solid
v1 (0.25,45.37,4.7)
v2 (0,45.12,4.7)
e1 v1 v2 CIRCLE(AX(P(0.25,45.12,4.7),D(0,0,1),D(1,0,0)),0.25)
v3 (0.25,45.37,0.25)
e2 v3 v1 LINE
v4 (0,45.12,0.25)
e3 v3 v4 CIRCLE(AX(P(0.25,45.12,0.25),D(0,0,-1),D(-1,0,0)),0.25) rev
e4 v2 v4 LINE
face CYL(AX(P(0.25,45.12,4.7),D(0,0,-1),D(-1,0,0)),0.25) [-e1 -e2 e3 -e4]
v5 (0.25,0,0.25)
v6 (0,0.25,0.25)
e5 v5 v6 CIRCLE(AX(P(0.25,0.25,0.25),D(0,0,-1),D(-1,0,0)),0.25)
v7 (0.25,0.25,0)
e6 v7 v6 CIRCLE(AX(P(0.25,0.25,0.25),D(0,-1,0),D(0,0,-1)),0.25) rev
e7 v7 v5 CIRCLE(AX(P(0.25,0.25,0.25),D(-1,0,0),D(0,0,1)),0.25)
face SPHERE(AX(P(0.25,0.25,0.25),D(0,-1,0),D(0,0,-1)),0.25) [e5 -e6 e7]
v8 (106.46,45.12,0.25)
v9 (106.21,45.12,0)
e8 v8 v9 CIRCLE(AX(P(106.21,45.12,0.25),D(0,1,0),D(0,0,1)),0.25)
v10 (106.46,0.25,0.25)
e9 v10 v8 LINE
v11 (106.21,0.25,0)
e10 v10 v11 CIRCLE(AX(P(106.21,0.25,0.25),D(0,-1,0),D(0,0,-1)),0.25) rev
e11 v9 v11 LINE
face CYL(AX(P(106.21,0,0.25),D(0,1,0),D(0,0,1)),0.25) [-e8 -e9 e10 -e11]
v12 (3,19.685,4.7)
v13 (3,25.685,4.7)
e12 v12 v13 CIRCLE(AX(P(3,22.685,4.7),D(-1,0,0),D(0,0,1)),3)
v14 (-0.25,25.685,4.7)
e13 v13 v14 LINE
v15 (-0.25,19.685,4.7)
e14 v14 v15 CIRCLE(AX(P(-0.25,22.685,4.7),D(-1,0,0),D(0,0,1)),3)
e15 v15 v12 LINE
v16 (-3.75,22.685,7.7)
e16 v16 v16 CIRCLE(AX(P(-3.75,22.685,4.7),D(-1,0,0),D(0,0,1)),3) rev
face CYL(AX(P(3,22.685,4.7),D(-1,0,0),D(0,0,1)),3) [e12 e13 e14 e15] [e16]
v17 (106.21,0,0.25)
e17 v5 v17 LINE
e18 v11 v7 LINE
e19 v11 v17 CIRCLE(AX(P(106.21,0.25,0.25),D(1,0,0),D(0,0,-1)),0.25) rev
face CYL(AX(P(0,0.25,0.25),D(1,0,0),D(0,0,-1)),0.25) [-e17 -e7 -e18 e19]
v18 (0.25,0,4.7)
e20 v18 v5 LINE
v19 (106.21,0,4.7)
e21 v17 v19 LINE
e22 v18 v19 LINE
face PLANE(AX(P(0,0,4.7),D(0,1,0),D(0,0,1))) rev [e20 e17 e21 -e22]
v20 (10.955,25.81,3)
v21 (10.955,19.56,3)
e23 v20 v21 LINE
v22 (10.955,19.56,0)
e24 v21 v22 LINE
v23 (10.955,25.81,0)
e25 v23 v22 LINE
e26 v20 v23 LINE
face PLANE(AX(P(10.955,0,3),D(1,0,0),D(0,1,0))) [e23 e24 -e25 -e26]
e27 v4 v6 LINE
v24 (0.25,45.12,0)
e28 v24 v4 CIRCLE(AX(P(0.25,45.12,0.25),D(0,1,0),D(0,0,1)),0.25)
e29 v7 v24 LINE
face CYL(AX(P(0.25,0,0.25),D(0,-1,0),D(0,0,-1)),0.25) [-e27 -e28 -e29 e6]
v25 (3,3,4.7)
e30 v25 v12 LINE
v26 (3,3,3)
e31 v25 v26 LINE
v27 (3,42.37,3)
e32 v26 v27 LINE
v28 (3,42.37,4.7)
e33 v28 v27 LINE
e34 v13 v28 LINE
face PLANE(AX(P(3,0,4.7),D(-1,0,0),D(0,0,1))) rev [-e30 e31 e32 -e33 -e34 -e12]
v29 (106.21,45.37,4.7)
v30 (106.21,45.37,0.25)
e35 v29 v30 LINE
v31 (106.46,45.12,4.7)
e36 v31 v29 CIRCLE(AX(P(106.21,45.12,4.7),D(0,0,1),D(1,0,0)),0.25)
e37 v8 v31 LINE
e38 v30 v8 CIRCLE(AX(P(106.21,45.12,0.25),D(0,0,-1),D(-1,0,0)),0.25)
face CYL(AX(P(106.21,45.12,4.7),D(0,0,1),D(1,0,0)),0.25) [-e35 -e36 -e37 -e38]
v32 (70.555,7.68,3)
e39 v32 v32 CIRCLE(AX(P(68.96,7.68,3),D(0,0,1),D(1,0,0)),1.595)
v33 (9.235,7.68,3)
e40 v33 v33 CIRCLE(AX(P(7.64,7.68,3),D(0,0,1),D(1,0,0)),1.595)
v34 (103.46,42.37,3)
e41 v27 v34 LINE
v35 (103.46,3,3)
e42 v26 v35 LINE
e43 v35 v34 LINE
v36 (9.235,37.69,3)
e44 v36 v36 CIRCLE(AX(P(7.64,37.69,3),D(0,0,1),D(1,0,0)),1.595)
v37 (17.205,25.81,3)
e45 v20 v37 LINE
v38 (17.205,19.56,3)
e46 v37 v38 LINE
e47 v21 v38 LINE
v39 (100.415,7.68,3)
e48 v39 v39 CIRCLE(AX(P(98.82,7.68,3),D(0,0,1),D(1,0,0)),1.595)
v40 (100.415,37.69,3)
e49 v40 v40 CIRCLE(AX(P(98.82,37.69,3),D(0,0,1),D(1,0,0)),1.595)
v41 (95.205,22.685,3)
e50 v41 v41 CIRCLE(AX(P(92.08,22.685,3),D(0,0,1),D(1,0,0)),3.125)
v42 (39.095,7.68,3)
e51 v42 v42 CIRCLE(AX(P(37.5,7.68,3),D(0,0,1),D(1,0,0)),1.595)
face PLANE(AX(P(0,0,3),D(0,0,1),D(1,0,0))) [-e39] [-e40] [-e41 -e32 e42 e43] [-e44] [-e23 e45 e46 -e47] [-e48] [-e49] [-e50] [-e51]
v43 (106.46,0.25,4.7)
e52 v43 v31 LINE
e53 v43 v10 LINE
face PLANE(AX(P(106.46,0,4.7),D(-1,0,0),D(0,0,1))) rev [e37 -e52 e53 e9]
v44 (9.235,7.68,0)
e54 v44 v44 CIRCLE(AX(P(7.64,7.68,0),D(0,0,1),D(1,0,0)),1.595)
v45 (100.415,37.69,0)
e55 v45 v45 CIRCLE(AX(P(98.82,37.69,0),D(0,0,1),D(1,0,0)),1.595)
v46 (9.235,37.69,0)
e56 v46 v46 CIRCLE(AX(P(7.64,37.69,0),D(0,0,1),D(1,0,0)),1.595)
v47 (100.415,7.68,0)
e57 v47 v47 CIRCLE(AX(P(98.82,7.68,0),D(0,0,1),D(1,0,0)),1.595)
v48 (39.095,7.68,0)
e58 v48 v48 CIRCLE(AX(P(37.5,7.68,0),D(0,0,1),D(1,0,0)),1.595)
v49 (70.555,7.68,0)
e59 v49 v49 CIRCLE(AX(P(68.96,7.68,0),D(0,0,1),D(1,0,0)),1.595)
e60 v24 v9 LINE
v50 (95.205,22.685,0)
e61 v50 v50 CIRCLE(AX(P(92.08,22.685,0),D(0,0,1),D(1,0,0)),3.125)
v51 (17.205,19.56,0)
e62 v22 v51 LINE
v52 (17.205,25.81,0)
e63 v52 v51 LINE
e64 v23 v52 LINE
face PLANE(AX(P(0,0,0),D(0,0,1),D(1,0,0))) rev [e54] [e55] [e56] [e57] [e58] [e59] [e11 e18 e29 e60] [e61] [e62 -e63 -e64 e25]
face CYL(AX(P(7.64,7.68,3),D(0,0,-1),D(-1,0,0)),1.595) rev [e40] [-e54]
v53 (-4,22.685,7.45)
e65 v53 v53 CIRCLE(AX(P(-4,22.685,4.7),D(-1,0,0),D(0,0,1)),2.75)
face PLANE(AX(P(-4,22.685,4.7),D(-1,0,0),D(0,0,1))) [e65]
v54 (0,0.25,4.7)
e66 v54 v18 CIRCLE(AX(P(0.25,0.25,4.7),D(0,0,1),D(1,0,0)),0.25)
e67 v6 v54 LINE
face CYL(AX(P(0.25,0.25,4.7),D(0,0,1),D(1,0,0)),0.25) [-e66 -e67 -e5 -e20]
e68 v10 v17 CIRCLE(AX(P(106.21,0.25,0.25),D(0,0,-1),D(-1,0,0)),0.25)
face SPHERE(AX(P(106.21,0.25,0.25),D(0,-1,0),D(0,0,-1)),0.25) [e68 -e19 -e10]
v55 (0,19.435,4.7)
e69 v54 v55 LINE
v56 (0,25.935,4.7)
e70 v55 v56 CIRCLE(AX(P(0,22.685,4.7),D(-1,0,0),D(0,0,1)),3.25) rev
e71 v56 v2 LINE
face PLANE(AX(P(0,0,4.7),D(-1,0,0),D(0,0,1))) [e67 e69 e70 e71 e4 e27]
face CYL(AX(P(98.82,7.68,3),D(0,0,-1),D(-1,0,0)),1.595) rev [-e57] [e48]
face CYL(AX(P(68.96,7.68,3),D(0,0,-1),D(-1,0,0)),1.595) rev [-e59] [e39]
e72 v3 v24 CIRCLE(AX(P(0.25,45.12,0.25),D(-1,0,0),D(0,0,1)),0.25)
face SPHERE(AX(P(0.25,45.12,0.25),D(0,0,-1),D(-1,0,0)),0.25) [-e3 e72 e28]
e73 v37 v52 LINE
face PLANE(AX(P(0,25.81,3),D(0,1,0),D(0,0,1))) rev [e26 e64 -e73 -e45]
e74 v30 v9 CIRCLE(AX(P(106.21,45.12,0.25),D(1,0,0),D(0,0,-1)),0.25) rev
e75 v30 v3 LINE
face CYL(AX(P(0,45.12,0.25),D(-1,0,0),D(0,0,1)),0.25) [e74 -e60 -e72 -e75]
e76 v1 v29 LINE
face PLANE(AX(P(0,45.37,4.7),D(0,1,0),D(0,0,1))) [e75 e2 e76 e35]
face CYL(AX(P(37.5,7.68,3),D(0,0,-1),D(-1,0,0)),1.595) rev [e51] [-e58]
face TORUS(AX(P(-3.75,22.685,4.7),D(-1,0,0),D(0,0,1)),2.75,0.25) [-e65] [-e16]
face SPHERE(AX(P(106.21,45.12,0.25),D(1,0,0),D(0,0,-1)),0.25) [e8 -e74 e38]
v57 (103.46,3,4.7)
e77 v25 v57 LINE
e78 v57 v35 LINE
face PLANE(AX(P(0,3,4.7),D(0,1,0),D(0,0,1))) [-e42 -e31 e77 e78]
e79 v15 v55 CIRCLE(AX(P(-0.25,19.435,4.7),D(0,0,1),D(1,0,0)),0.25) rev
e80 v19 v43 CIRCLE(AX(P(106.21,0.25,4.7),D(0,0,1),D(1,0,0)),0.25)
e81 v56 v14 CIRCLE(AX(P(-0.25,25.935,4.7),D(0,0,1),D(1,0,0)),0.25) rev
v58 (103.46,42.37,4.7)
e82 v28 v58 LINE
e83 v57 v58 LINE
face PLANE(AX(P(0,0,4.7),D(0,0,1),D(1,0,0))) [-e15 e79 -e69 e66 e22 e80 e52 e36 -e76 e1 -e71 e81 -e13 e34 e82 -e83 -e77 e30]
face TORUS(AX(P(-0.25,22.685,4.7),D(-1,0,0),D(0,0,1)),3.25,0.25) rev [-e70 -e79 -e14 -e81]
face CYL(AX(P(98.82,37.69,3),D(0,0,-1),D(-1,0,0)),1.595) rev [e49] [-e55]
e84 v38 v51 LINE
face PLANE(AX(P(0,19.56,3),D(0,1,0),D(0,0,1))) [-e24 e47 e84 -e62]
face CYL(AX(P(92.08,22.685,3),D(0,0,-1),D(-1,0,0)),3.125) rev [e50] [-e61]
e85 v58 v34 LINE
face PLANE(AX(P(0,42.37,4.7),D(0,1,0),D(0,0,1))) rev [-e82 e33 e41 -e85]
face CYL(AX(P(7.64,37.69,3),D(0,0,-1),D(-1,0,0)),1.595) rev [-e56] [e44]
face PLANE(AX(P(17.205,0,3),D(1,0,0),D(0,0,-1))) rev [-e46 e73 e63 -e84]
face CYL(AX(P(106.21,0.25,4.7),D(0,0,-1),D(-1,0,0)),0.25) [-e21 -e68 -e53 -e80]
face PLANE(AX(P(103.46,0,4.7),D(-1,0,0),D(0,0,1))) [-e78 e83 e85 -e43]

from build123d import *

# Parameters (mm, degrees)
SKETCH1_W                = 100.46
SKETCH1_H                = 39.37
SKETCH1_R                = 1.595
SKETCH1_R_2              = 3.125
SKETCH1_W_2              = 6.25
SKETCH1_H_2              = 6.25
BOSS_EXTRUDE1_DEPTH      = 3
SKETCH1_5_W              = 106.46
SKETCH1_5_H              = 45.37
SKETCH1_5_W_2            = 100.46
SKETCH1_5_H_2            = 39.37
BOSS_EXTRUDE2_DEPTH      = 4.7
BOSS_EXTRUDE3_DEPTH      = 4
BOSS_EXTRUDE3_DEPTH_BACK = 3
SKETCH2_R                = 3
FILLET1_R                = 0.25


with BuildPart() as part:
    # Sketch1 → Boss-Extrude1 (new body)
    with BuildSketch(Plane.XY):
        with Locations((53.23, 22.685)):
            Rectangle(SKETCH1_W, SKETCH1_H)
        with Locations((7.64, 7.68)):
            Circle(SKETCH1_R, mode=Mode.SUBTRACT)
        with Locations((37.5, 7.68)):
            Circle(SKETCH1_R, mode=Mode.SUBTRACT)
        with Locations((68.96, 7.68)):
            Circle(SKETCH1_R, mode=Mode.SUBTRACT)
        with Locations((98.82, 7.68)):
            Circle(SKETCH1_R, mode=Mode.SUBTRACT)
        with Locations((7.64, 37.69)):
            Circle(SKETCH1_R, mode=Mode.SUBTRACT)
        with Locations((98.82, 37.69)):
            Circle(SKETCH1_R, mode=Mode.SUBTRACT)
        with Locations((92.08, 22.685)):
            Circle(SKETCH1_R_2, mode=Mode.SUBTRACT)
        with Locations((14.08, 22.685)):
            Rectangle(SKETCH1_W_2, SKETCH1_H_2, mode=Mode.SUBTRACT)
    extrude(amount=BOSS_EXTRUDE1_DEPTH)

    # Sketch1<5> → Boss-Extrude2 (add)
    with BuildSketch(Plane.XY):
        with Locations((53.23, 22.685)):
            Rectangle(SKETCH1_5_W, SKETCH1_5_H)
        with Locations((53.23, 22.685)):
            Rectangle(SKETCH1_5_W_2, SKETCH1_5_H_2, mode=Mode.SUBTRACT)
    extrude(amount=BOSS_EXTRUDE2_DEPTH)

    # Sketch2 → Boss-Extrude3 (add, two sides: drawn at the far end of the back side and taken through both)
    with BuildSketch(Plane.ZY.offset(-BOSS_EXTRUDE3_DEPTH_BACK)):
        with Locations((4.7, 22.685)):
            Circle(SKETCH2_R)
    extrude(amount=BOSS_EXTRUDE3_DEPTH + BOSS_EXTRUDE3_DEPTH_BACK)

    # Fillet1
    # the kernel refuses this fillet: 0.25 mm, written as the material it adds along each edge
    with BuildSketch(Plane(origin=(0, 22.685, 4.7), x_dir=(0, 1, 0), z_dir=(0, 0, 1))) as fillet1_piece_1:
        with BuildLine():
            CenterArc((3 + FILLET1_R, FILLET1_R), FILLET1_R, 180, 90)
            Line((3 + FILLET1_R, 0), (3, 0))
            Line((3, 0), (3, FILLET1_R))
        make_face()
    revolve(axis=Axis((0, 22.685, 4.7), (-1, 0, 0)), revolution_arc=180)
    # the kernel refuses this fillet: 0.25 mm, written as the material it takes off along each edge
    with BuildSketch(Plane(origin=(0.25, 0.25, 0.25), x_dir=(0, 0, -1), z_dir=(-1, 0, 0))) as fillet1_2_piece_1_section:
        Polygon((0, 0), (FILLET1_R, 0), (FILLET1_R, FILLET1_R), (0, FILLET1_R), align=None)
    fillet1_2_piece_1 = extrude(amount=FILLET1_R, mode=Mode.PRIVATE)
    fillet1_2_piece_1 = fillet1_2_piece_1 - Plane(origin=(0.25, 0.25, 0.25), x_dir=(0, 0.7071067811865475, 0.7071067811865475), z_dir=(-1, 0, 0)) * Sphere(FILLET1_R, mode=Mode.PRIVATE)
    add(fillet1_2_piece_1, mode=Mode.SUBTRACT)
    with BuildSketch(Plane(origin=(106.21, 0.25, 0.25), x_dir=(0, -1, 0), z_dir=(0, 0, -1))) as fillet1_2_piece_2_section:
        Polygon((0, 0), (FILLET1_R, 0), (FILLET1_R, -FILLET1_R), (0, -FILLET1_R), align=None)
    fillet1_2_piece_2 = extrude(amount=FILLET1_R, mode=Mode.PRIVATE)
    fillet1_2_piece_2 = fillet1_2_piece_2 - Plane(origin=(106.21, 0.25, 0.25), x_dir=(-0.7071067811865475, 0.7071067811865475, 0), z_dir=(0, 0, -1)) * Sphere(FILLET1_R, mode=Mode.PRIVATE)
    add(fillet1_2_piece_2, mode=Mode.SUBTRACT)
    with BuildSketch(Plane(origin=(106.21, 45.12, 0.25), x_dir=(1, 0, 0), z_dir=(0, 0, -1))) as fillet1_2_piece_3_section:
        Polygon((0, 0), (FILLET1_R, 0), (FILLET1_R, -FILLET1_R), (0, -FILLET1_R), align=None)
    fillet1_2_piece_3 = extrude(amount=FILLET1_R, mode=Mode.PRIVATE)
    fillet1_2_piece_3 = fillet1_2_piece_3 - Plane(origin=(106.21, 45.12, 0.25), x_dir=(-0.7071067811865475, -0.7071067811865475, 0), z_dir=(0, 0, -1)) * Sphere(FILLET1_R, mode=Mode.PRIVATE)
    add(fillet1_2_piece_3, mode=Mode.SUBTRACT)
    with BuildSketch(Plane(origin=(0.25, 45.12, 0.25), x_dir=(0, 0, -1), z_dir=(-1, 0, 0))) as fillet1_2_piece_4_section:
        Polygon((0, 0), (FILLET1_R, 0), (FILLET1_R, -FILLET1_R), (0, -FILLET1_R), align=None)
    fillet1_2_piece_4 = extrude(amount=FILLET1_R, mode=Mode.PRIVATE)
    fillet1_2_piece_4 = fillet1_2_piece_4 - Plane(origin=(0.25, 45.12, 0.25), x_dir=(0, -0.7071067811865475, 0.7071067811865475), z_dir=(-1, 0, 0)) * Sphere(FILLET1_R, mode=Mode.PRIVATE)
    add(fillet1_2_piece_4, mode=Mode.SUBTRACT)
    with BuildSketch(Plane(origin=(0.25, 0, 0), x_dir=(0, 1, 0), z_dir=(1, 0, 0)), Plane(origin=(106.21, 45.37, 0), x_dir=(0, -1, 0), z_dir=(-1, 0, 0))) as fillet1_2_piece_5:
        with BuildLine():
            CenterArc((FILLET1_R, FILLET1_R), FILLET1_R, 180, 90)
            Line((0, FILLET1_R), (0, 0))
            Line((0, 0), (FILLET1_R, 0))
        make_face()
    extrude(amount=105.96, mode=Mode.SUBTRACT)
    with BuildSketch(Plane(origin=(0, 0, 0.25), x_dir=(1, 0, 0), z_dir=(0, 0, 1))) as fillet1_2_piece_6:
        with BuildLine():
            CenterArc((FILLET1_R, FILLET1_R), FILLET1_R, 180, 90)
            Line((0, FILLET1_R), (0, 0))
            Line((0, 0), (FILLET1_R, 0))
        make_face()
    extrude(amount=5.075, mode=Mode.SUBTRACT)
    with BuildSketch(Plane(origin=(106.46, 0.25, 0), x_dir=(-1, 0, 0), z_dir=(0, 1, 0)), Plane(origin=(0, 45.12, 0), x_dir=(1, 0, 0), z_dir=(0, -1, 0))) as fillet1_2_piece_7:
        with BuildLine():
            CenterArc((FILLET1_R, FILLET1_R), FILLET1_R, 180, 90)
            Line((0, FILLET1_R), (0, 0))
            Line((0, 0), (FILLET1_R, 0))
        make_face()
    extrude(amount=44.87, mode=Mode.SUBTRACT)
    with BuildSketch(Plane(origin=(106.46, 0, 0.25), x_dir=(-1, 0, 0), z_dir=(0, 0, 1)), Plane(origin=(106.46, 45.37, 0.25), x_dir=(0, -1, 0), z_dir=(0, 0, 1)), Plane(origin=(0, 45.37, 0.25), x_dir=(1, 0, 0), z_dir=(0, 0, 1))) as fillet1_2_piece_8:
        with BuildLine():
            CenterArc((FILLET1_R, -FILLET1_R), FILLET1_R, 90, 90)
            Line((0, -FILLET1_R), (0, 0))
            Line((0, 0), (FILLET1_R, 0))
        make_face()
    extrude(amount=5.075, mode=Mode.SUBTRACT)
    with BuildSketch(Plane(origin=(-4, 22.685, 4.7), x_dir=(0, 0, 1), z_dir=(0, -1, 0))) as fillet1_2_piece_9:
        with BuildLine():
            CenterArc((3 - FILLET1_R, -FILLET1_R), FILLET1_R, 0, 90)
            Line((3 - FILLET1_R, 0), (3, 0))
            Line((3, 0), (3, -FILLET1_R))
        make_face()
    revolve(axis=Axis((-4, 22.685, 4.7), (-1, 0, 0)), mode=Mode.SUBTRACT)


solid = part.part
